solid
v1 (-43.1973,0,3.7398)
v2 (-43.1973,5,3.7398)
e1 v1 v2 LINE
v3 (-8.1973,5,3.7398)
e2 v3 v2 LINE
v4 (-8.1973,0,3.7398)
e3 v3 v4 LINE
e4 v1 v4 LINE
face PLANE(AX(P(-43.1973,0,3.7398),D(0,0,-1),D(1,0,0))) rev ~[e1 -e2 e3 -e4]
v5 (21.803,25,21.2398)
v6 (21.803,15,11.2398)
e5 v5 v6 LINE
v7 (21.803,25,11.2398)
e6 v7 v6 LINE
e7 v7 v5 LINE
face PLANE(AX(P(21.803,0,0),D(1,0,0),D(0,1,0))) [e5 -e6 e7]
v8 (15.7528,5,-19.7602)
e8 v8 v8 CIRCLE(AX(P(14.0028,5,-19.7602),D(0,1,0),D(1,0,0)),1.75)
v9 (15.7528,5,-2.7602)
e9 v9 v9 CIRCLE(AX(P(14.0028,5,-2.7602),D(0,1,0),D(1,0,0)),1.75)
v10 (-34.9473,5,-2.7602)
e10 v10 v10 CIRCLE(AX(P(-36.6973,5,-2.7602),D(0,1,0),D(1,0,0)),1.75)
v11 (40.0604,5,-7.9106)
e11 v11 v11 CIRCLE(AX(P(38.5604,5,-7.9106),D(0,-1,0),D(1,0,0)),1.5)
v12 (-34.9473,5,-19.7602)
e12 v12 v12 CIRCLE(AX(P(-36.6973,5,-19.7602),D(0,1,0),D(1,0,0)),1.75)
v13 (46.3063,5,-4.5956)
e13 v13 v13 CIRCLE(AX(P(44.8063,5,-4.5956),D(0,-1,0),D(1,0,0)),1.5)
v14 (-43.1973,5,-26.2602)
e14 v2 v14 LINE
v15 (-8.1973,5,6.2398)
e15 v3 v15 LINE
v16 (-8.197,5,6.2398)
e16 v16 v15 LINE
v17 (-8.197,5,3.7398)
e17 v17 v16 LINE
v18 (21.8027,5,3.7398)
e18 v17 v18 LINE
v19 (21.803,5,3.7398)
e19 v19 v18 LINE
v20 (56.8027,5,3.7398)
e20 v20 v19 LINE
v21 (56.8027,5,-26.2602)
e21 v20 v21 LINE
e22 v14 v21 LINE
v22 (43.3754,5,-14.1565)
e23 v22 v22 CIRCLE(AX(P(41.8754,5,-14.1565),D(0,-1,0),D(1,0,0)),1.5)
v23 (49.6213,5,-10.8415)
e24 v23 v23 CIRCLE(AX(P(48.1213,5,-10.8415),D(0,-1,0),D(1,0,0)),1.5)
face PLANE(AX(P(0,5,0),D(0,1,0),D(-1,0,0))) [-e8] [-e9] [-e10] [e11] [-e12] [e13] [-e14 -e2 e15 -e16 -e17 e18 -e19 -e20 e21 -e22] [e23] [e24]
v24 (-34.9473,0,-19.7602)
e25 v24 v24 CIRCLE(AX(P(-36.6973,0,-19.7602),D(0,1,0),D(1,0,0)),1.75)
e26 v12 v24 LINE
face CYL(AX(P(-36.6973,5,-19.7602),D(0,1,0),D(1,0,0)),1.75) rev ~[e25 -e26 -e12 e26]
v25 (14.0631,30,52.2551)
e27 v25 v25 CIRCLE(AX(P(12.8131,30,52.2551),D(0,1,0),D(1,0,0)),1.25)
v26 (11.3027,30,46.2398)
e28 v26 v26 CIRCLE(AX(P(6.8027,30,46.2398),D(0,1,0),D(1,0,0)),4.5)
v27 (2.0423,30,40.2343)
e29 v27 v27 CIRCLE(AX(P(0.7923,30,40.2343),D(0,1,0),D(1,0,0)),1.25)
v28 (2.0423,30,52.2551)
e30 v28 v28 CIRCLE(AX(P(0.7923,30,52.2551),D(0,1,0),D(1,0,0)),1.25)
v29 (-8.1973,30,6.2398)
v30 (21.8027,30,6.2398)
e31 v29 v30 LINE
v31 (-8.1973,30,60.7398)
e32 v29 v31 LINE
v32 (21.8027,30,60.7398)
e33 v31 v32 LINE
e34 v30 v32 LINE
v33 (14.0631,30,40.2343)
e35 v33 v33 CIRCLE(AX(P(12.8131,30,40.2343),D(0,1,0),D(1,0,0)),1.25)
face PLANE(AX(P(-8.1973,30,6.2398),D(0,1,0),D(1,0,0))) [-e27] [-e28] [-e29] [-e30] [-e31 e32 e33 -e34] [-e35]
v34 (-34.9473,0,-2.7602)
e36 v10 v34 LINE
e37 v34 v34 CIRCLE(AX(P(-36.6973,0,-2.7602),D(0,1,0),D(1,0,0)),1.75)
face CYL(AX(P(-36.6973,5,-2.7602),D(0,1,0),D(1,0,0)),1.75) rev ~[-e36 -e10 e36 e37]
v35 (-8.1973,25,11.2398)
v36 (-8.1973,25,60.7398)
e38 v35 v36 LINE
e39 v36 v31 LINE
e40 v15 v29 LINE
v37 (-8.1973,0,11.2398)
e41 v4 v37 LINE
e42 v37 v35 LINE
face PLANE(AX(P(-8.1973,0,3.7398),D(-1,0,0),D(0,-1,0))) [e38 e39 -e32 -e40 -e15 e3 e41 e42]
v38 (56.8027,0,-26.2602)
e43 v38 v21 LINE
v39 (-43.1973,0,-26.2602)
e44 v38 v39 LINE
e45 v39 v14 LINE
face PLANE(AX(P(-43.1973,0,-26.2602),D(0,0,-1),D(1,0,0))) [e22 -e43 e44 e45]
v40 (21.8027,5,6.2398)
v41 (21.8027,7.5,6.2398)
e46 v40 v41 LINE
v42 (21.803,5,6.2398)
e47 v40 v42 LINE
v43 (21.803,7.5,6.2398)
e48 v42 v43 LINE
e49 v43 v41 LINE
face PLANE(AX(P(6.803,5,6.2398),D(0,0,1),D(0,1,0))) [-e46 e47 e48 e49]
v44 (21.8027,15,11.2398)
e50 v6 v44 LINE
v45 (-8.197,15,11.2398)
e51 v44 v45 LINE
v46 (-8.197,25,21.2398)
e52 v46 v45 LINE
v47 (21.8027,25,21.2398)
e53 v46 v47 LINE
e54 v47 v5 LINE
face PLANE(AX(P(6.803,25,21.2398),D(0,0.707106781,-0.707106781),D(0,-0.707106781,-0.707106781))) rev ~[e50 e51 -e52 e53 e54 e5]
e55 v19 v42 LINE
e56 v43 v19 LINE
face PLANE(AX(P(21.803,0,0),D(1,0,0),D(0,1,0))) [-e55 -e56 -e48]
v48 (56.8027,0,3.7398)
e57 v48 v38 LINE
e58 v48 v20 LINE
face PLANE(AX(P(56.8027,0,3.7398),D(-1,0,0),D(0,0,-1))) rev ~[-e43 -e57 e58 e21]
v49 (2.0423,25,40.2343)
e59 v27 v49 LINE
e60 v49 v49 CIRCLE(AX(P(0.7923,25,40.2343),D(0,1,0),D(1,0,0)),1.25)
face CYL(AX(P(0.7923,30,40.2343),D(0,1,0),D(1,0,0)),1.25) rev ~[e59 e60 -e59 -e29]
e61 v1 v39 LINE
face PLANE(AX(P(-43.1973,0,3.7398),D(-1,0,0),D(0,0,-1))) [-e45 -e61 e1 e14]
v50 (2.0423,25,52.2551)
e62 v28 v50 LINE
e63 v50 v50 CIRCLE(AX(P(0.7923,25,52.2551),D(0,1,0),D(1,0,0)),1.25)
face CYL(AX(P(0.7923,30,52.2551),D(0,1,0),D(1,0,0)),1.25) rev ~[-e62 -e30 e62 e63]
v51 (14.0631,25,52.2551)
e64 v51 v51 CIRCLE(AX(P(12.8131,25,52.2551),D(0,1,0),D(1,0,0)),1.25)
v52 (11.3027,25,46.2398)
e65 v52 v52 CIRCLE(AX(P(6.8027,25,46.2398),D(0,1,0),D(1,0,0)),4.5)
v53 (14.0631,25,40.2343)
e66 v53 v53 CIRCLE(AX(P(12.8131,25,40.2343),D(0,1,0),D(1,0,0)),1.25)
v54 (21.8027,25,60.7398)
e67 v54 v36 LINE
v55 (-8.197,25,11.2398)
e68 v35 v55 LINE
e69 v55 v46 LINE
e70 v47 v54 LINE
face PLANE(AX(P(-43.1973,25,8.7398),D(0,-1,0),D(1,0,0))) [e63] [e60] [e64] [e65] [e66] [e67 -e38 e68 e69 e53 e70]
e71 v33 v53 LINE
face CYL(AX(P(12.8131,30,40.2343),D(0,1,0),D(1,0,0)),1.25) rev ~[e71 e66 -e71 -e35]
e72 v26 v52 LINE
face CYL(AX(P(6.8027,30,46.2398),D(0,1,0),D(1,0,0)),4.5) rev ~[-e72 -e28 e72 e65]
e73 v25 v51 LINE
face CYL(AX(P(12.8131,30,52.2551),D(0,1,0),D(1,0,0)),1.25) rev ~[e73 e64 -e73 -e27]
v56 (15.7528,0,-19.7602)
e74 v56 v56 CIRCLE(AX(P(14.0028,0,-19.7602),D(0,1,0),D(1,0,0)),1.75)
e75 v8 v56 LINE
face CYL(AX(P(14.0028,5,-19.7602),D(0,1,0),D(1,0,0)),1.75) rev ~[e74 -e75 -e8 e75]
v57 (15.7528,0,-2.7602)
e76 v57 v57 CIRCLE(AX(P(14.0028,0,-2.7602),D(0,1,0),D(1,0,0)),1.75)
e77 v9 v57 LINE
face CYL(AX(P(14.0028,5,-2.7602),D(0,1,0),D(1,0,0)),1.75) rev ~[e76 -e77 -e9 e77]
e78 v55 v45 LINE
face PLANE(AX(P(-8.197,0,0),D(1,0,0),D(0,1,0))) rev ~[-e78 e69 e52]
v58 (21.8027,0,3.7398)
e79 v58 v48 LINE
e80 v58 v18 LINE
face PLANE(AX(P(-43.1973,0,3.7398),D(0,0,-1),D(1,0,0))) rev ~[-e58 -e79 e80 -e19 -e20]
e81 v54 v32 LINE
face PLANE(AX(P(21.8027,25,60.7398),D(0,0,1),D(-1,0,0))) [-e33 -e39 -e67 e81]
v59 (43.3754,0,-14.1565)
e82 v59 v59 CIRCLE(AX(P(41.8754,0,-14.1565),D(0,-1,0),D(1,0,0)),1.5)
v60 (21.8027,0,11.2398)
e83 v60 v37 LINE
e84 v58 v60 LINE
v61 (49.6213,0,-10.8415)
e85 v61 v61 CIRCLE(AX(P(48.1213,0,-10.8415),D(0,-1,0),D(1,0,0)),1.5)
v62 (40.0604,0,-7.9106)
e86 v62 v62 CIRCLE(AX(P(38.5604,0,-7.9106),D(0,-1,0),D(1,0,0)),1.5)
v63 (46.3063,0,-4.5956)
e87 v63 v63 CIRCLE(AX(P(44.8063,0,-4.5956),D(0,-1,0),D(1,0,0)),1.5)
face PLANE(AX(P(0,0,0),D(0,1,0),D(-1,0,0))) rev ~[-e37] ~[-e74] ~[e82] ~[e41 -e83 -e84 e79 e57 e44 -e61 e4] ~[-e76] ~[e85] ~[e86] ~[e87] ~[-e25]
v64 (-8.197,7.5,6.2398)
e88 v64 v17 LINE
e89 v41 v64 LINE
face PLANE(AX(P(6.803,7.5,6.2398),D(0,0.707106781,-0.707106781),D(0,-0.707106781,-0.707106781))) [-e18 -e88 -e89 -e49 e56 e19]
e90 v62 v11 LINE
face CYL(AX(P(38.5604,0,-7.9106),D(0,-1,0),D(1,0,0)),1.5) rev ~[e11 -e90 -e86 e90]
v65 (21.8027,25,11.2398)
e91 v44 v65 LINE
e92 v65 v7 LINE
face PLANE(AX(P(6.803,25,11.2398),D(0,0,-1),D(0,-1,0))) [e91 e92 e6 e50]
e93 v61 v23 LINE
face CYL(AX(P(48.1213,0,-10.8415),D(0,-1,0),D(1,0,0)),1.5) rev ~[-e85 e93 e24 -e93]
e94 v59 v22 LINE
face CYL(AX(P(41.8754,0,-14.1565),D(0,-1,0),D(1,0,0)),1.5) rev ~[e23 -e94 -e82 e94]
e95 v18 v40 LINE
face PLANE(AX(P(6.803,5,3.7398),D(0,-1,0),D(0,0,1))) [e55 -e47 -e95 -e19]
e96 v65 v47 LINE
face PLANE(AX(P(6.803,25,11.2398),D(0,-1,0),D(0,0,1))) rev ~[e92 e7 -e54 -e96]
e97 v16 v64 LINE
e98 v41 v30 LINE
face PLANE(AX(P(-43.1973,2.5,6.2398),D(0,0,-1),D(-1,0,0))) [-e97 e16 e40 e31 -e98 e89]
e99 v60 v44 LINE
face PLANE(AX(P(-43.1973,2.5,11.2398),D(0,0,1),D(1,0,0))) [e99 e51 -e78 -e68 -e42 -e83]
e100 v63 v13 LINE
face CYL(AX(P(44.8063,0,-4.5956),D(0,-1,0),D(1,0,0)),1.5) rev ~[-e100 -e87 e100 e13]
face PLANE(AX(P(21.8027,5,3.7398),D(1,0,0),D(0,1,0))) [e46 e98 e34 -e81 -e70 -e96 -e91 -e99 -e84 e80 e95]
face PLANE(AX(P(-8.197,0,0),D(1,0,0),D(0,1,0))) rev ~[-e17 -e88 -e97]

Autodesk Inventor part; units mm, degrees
sketch "Sketch1" plane through (0, 0, 0) normal (0, 1, 0) x (-1, 0, 0)
  line L0 (43.1973, 3.7398) -> (-56.8027, 3.7398)
  line L1 (-56.8027, 3.7398) -> (-56.8027, -26.2602)
  line L2 (43.1973, 3.7398) -> (43.1973, -26.2602)
  line L3 (-21.8027, -26.2602) -> (8.1973, -26.2602)
  line L4 (43.1973, -26.2602) -> (8.1973, -26.2602)
  line L5 (-21.8027, -26.2602) -> (-56.8027, -26.2602)
  line L6 (-21.8027, 3.7398) -> (8.1973, 3.7398)
  point P0 (0, 0)
  dimension "d2" = 100
  dimension "d6" = 30
extrude "Extrusion1" add sketch "Sketch1" along normal blind 5
sketch "Sketch4" plane through (0, 5, 0) normal (0, 1, 0) x (1, 0, 0)
  circle A0 centre (-36.6973, 2.7602) radius 1.75 projected
  circle A1 centre (-36.6973, 19.7602) radius 1.75 projected
  circle A2 centre (14.0028, 2.7602) radius 1.75 projected
  circle A3 centre (14.0028, 19.7602) radius 1.75 projected
  point P0 (0, 0)
extrude "Extrusion3" cut sketch "Sketch4" against normal through all
sketch "Sketch5" plane through (0, 0, 0) normal (0, -1, 0) x (1, 0, 0)
  circle A0 centre (41.8754, -14.1565) radius 1.5
  circle A1 centre (48.1213, -10.8415) radius 1.5
  circle A2 centre (44.8063, -4.5956) radius 1.5
  circle A3 centre (38.5604, -7.9106) radius 1.5
  line L0 (44.8063, -4.5956) -> (48.1213, -10.8415) construction
  line L1 (48.1213, -10.8415) -> (41.8754, -14.1565) construction
  line L2 (41.8754, -14.1565) -> (38.5604, -7.9106) construction
  line L3 (38.5604, -7.9106) -> (44.8063, -4.5956) construction
  line L4 (44.8063, -4.5956) -> (41.8754, -14.1565) construction
  line L5 (48.1213, -10.8415) -> (38.5604, -7.9106) construction
  line L6 (43.3409, -9.376) -> (52.1686, -4.6925)
  point P0 (0, 0)
  dimension "d47" = 3
  dimension "d48" = 3
  dimension "d49" = 3
  dimension "d50" = 3
  dimension "d51" = 3.315
  dimension "d52" = 3.315
  dimension "d53" = 7.0711
  dimension "d54" = 7.0711
  dimension "d55" = 7.0711
  dimension "d56" = 7.0711
extrude "Extrusion4" cut sketch "Sketch5" against normal up to next
sketch "Sketch6" plane through (0, 0, 0) normal (0, -1, 0) x (1, 0, 0)
  circle A0 centre (6.7527, 80.0276) radius 4.235 projected
  circle A1 centre (6.7527, 80.0276) radius 4.8512
  point P0 (0, 0)
  dimension "d19" = 0.6162
sketch "Sketch7" plane through (-43.1973, 0, 3.7398) normal (0, 0, 1) x (1, 0, 0)
  line L0 (0, 0) -> (100, 0) projected
  line L1 (100, 0) -> (100, 5) projected
  line L2 (0, 5) -> (100, 5) projected
  line L3 (0, 0) -> (0, 5) projected
  line L4 (65, 0) -> (35, 0)
  line L5 (35, 0) -> (35, 5)
  line L6 (35, 5) -> (65, 5)
  line L7 (65, 5) -> (65, 0)
  line L8 (65, 0) -> (35, 5) construction
  line L9 (35, 0) -> (65, 5) construction
  point P0 (43.1973, 0)
  point P1 (50, 2.5)
  dimension "d22" = 30
  dimension "d23" = 5
  dimension "d24" = 6.8027
  dimension "d57" = 0
ref_plane "Work Plane2" through (6.8027, 0, 0) normal (1, 0, 0) x (0, 1, 0)
sketch "Sketch9" plane through (6.8027, 0, 0) normal (1, 0, 0) x (0, 1, 0)
  line L0 (2.5, 3.7398) -> (2.5, 8.7398)
  line L1 (2.5, 3.7398) -> (7.5, 3.7398) construction
  line L2 (2.5, 8.7398) -> (27.5, 8.7398)
  line L3 (27.5, 8.7398) -> (27.5, 88.7398)
  point P0 (0, 0)
  dimension "d26" = 5
  dimension "d27" = 90
  dimension "d28" = 25
  dimension "d29" = 80
sweep "Sweep1" add profiles "Sketch7" path "Sketch9" contours L5 L2 L7 L0
ref_plane "YZ 0" through (6.803, 0, 0) normal (1, 0, 0) x (0, 1, 0)
ref_plane "XY 0" through (0, 0, -11.25) normal (0, 0, 1) x (1, 0, 0)
sketch "Sketch12" plane through (-8.1973, 25, 11.2398) normal (0, -1, 0) x (1, 0, 0)
  circle A0 centre (15.0003, 42.485) radius 1.11
  point P0 (8.1973, -11.2398)
extrude "Extrusion8" cut sketch "Sketch12" against normal up to next
sketch "Sketch13" plane through (-8.1973, 30, 6.2398) normal (0, 1, 0) x (1, 0, 0)
  circle A0 centre (15.0003, -45.985) radius 1.4
  point P0 (8.1973, 6.2398)
extrude "Extrusion9" cut sketch "Sketch13" against normal up to next
sketch "Sketch15" plane through (-8.1973, 30, 6.2398) normal (0, 1, 0) x (1, 0, 0)
  circle A0 centre (15, -40) radius 4.5
  point P0 (8.1973, 6.2398)
  dimension "d40" = 9
extrude "Extrusion10" cut sketch "Sketch15" against normal up to next
sketch "Sketch16" plane through (-8.1973, 25, 11.2398) normal (0, -1, 0) x (1, 0, 0)
  circle A0 centre (15, 42.5) radius 12
  line L0 (30, 0) -> (30, 77.5) projected
  line L1 (0, 0) -> (0, 77.5) projected
  line L2 (30, 77.5) -> (0, 77.5)
  line L3 (0, 77.5) -> (0, 57.5)
  line L4 (0, 57.5) -> (30, 57.5)
  line L5 (30, 57.5) -> (30, 77.5)
  point P0 (8.1973, -11.2398)
  point P1 (15, 57.5)
  dimension "d43" = 15
  dimension "d44" = 15
extrude "Extrusion11" cut sketch "Sketch16" against normal up to next contours L4 L1 L2 L0
sketch "Sketch17" plane through (-8.1973, 30, 6.2398) normal (0, 1, 0) x (1, 0, 0)
  circle A0 centre (8.9896, -46.0153) radius 1.25
  circle A1 centre (8.9896, -33.9945) radius 1.25
  circle A2 centre (21.0104, -46.0153) radius 1.25
  circle A3 centre (21.0104, -33.9945) radius 1.25
  line L0 (8.9896, -46.0153) -> (8.9896, -33.9945) construction
  line L1 (8.9896, -33.9945) -> (21.0104, -33.9945) construction
  line L2 (21.0104, -33.9945) -> (21.0104, -46.0153) construction
  line L3 (21.0104, -46.0153) -> (8.9896, -46.0153) construction
  line L4 (21.0104, -33.9945) -> (8.9896, -46.0153) construction
  line L5 (8.9896, -33.9945) -> (21.0104, -46.0153) construction
  line L6 (0, -62.5) -> (30, -62.5) construction
  line L7 (0, 0) -> (0, -62.5) construction
  line L8 (30, 0) -> (30, -62.5) construction
  point P0 (8.1973, 6.2398)
  dimension "d64" = 12.0208
  dimension "d65" = 12.0208
  dimension "d66" = 12.0208
  dimension "d67" = 12.0208
  dimension "d68" = 17
  dimension "d69" = 17
  dimension "d70" = 2.5
  dimension "d71" = 2.5
  dimension "d72" = 2.5
  dimension "d73" = 2.5
extrude "Extrusion12" cut sketch "Sketch17" against normal up to next
sketch "Sketch18" plane through (6.803, 0, 0) normal (1, 0, 0) x (0, 1, 0)
  line L0 (25, 11.2398) -> (15, 11.2398)
  line L1 (0, 11.2398) -> (25, 11.2398) projected
  line L2 (25, 11.2398) -> (25, 21.2398)
  line L3 (25, 11.2398) -> (25, 68.7398) projected
  line L4 (25, 21.2398) -> (15, 11.2398)
  point P0 (0, 0)
  dimension "d76" = 10
  dimension "d79" = 10
extrude "Extrusion13" add sketch "Sketch18" along normal mid plane 30
sketch "Sketch19" plane through (6.803, 0, 0) normal (1, 0, 0) x (0, 1, 0)
  line L0 (5, 6.2398) -> (7.5, 6.2398)
  line L1 (5, 6.2398) -> (30, 6.2398) projected
  line L2 (5, 6.2398) -> (7.5, 6.2398) construction
  line L3 (7.5, 6.2398) -> (5, 3.7398)
  line L4 (5, 3.7398) -> (5, 6.2398)
  point P0 (0, 0)
  dimension "d80" = 2.5
  dimension "d81" = 0
  dimension "d82" = 45
extrude "Extrusion14" add sketch "Sketch19" along normal mid plane 30
sketch "Sketch20" plane through (-8.1973, 30, 6.2398) normal (0, 1, 0) x (1, 0, 0)
  circle A0 centre (15, -40) radius 4.5 projected
  arc A1 (15.9875, -46.9776) -> (14.013, -46.9776) centre (15.0003, -45.985) ccw projected
  arc A2 (14.013, -46.9776) -> (15.9875, -46.9776) centre (15.0003, -47.485) ccw projected
  point P0 (8.1973, 6.2398)
extrude "Extrusion15" add sketch "Sketch20" against normal blind 5 contours A2 A1
sketch "Sketch21" plane through (-8.1973, 25, 68.7398) normal (0, -1, 0) x (1, 0, 0)
  line L0 (30, -47.5) -> (30, 0) projected
  line L1 (0, 0) -> (30, 0)
  line L2 (30, 0) -> (30, -8)
  line L3 (30, -8) -> (0, -8)
  line L4 (0, -8) -> (0, 0)
  point P0 (8.1973, -68.7398)
extrude "Extrusion16" cut sketch "Sketch21" against normal through all
equation "\"d71\" = d70"
equation "\"d72\" = d70"
equation "\"d73\" = d70"
properties part number "DudukanExt"
